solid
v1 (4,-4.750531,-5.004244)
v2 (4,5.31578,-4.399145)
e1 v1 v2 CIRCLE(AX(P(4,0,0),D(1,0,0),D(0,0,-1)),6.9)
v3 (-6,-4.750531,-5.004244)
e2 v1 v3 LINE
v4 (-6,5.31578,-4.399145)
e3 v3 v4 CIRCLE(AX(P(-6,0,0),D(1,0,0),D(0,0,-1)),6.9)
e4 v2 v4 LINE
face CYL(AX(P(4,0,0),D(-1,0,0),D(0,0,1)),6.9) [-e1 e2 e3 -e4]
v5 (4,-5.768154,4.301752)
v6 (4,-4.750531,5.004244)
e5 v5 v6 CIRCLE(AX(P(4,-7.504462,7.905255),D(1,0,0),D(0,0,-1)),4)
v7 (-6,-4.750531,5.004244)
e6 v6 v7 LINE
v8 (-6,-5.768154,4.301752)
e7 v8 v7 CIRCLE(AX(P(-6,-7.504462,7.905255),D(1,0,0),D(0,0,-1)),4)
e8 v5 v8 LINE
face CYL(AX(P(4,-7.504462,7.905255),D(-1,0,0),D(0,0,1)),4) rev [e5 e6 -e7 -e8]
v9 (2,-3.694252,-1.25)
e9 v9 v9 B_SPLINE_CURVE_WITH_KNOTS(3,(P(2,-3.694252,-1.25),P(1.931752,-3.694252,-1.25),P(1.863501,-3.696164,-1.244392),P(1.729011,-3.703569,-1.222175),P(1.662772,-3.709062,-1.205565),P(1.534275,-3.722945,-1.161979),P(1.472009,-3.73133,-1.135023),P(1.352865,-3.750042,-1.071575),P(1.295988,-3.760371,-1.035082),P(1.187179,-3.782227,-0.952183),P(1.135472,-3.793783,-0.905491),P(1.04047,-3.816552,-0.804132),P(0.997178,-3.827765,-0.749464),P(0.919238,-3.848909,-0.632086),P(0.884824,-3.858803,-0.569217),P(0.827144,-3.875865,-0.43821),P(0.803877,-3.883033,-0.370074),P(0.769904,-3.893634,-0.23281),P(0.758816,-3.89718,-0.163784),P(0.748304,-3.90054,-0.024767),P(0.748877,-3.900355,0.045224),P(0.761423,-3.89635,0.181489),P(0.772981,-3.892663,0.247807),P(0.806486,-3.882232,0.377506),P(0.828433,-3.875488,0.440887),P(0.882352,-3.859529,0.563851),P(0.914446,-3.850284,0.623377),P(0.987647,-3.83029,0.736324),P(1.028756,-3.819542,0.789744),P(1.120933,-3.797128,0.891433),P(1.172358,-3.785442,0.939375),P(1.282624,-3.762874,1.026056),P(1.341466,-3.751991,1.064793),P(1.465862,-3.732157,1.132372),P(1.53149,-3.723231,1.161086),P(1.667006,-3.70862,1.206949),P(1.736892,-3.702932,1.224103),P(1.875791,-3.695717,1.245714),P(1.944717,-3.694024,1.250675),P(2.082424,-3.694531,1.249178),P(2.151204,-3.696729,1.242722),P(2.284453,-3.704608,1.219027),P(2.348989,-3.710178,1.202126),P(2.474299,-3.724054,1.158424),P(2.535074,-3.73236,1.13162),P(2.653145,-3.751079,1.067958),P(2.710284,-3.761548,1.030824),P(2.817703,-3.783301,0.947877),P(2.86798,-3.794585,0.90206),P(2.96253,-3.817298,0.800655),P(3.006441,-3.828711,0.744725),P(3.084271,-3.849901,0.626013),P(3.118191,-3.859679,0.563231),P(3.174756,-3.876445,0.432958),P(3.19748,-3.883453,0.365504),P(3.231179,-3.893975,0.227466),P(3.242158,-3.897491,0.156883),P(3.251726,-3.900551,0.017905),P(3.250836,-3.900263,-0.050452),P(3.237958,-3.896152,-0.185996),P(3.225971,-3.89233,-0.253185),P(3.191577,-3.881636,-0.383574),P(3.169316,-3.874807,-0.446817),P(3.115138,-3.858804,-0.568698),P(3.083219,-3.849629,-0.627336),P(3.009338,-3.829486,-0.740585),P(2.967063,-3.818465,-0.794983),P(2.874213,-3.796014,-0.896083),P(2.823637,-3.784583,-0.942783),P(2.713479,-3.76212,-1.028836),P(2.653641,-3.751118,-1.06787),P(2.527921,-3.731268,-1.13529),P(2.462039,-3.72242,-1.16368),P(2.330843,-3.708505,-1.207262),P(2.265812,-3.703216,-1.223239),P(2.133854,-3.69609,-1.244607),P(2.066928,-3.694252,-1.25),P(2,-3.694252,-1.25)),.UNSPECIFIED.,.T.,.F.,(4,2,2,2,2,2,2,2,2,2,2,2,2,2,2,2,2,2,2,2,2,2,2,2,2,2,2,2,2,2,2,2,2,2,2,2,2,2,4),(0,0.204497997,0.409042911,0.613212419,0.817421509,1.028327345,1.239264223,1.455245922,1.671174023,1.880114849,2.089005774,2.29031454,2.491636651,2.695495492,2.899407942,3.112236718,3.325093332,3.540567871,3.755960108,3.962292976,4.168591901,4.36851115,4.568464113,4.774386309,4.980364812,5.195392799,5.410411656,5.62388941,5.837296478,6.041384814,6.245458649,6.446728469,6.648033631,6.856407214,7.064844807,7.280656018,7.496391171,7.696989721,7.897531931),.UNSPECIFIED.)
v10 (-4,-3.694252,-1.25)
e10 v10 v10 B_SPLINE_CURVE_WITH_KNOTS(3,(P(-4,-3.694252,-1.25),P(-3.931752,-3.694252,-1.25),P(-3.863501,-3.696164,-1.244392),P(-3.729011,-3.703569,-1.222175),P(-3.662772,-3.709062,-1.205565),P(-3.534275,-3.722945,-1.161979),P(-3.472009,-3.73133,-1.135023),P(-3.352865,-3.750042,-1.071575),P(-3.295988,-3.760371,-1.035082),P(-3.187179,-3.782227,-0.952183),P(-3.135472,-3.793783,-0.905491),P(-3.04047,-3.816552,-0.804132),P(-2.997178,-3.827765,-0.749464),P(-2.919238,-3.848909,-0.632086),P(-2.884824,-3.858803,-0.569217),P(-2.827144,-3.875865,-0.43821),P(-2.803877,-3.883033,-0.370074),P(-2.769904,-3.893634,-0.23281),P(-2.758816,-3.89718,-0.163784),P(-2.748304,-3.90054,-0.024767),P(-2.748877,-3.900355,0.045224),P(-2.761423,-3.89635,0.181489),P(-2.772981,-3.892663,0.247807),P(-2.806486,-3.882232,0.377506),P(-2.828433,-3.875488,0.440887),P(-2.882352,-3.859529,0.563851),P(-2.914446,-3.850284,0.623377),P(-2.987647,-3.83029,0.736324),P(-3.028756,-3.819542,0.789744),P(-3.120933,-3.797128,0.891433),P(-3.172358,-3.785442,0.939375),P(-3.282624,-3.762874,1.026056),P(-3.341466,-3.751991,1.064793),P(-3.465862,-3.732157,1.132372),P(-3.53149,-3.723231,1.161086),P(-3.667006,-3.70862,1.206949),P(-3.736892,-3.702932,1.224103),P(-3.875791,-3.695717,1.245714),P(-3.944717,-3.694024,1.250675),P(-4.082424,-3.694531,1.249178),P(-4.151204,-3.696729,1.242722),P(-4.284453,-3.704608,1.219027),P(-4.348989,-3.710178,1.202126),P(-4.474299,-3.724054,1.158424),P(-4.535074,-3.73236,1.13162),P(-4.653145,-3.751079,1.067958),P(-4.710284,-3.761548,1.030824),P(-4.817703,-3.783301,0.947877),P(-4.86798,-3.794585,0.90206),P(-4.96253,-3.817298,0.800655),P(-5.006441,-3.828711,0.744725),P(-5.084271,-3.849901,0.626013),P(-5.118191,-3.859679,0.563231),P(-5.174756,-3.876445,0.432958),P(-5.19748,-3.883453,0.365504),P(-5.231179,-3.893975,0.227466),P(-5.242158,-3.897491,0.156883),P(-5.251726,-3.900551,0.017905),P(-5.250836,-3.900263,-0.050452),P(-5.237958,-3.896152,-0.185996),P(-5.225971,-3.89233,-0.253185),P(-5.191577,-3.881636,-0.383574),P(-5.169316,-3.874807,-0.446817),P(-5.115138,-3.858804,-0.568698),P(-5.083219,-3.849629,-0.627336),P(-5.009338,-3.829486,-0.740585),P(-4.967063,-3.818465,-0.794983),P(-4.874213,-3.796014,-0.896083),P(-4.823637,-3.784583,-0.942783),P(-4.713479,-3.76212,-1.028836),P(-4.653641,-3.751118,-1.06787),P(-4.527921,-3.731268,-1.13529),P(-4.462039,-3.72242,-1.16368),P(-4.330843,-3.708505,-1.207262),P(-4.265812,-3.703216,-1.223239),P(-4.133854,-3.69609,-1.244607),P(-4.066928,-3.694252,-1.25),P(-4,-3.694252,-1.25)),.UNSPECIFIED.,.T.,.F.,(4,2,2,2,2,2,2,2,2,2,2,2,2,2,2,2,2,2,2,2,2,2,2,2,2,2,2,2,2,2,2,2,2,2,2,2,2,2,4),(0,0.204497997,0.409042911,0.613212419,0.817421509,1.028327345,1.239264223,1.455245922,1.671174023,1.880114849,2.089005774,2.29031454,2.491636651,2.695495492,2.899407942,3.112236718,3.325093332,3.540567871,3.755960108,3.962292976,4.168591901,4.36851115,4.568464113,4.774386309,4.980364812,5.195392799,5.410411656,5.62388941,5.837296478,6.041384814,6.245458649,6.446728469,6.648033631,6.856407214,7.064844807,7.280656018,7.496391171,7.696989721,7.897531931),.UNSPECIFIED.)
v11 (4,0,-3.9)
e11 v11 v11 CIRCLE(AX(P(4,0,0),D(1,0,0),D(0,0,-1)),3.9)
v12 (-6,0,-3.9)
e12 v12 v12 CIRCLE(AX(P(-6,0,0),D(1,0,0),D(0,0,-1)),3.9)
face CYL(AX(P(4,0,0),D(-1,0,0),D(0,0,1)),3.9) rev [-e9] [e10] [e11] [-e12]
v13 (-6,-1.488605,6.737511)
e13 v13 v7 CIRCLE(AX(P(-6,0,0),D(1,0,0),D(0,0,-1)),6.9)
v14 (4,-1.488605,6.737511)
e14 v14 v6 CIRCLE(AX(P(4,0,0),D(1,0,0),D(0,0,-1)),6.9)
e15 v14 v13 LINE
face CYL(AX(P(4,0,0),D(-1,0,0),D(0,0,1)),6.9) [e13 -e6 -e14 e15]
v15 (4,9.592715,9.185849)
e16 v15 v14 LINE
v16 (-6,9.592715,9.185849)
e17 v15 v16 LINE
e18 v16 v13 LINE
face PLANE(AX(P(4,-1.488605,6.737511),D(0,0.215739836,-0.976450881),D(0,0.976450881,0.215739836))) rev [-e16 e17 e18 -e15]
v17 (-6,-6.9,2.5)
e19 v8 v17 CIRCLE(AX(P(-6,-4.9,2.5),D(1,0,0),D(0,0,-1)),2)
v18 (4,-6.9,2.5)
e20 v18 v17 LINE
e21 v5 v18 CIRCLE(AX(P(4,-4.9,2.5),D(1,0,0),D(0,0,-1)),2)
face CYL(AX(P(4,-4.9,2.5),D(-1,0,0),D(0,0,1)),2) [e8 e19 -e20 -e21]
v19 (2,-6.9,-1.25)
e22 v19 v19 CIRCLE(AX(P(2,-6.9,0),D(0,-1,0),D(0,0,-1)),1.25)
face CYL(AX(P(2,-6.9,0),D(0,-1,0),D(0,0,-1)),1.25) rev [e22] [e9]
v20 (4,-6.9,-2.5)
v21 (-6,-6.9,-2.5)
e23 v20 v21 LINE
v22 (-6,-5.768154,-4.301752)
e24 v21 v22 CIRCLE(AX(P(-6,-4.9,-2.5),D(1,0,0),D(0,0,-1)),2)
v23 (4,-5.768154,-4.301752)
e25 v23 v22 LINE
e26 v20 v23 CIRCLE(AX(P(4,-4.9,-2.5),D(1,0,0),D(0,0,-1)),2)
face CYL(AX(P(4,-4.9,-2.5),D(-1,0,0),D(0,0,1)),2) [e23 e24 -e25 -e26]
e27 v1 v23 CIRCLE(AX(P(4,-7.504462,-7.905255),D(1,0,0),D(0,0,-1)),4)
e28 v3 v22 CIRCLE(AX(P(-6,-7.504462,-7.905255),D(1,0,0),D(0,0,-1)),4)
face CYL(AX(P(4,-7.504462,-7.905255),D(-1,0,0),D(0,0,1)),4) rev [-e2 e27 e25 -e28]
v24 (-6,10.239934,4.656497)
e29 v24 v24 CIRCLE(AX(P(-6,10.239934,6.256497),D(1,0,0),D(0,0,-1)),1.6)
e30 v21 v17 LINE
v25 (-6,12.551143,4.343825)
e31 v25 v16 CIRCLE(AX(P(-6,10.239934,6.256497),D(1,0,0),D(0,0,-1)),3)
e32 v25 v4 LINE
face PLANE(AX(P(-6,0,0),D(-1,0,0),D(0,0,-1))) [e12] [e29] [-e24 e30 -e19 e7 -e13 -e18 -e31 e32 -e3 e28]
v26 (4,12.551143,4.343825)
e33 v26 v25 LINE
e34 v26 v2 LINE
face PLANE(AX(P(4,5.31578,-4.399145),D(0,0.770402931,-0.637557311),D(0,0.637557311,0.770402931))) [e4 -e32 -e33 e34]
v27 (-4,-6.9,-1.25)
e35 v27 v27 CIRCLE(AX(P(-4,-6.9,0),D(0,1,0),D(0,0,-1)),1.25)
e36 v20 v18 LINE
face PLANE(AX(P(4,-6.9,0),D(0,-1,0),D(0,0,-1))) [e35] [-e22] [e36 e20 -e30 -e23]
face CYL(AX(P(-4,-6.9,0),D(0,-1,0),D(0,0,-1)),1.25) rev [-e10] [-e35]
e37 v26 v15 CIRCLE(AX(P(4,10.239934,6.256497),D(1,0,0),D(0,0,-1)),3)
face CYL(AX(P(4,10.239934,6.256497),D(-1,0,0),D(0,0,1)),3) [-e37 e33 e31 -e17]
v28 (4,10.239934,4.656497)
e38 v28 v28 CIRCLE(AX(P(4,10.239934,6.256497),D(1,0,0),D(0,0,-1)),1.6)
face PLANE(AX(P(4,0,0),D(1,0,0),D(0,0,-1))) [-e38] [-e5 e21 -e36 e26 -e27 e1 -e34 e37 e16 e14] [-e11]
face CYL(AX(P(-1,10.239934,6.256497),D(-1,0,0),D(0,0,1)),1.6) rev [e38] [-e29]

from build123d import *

# Parameters (mm, degrees)
BOSS_EXTRUDE1_START    = -1
SKETCH2_R              = 3.9
BOSS_EXTRUDE1_DEPTH    = 5
M3_CLEARANCE_HOLE1_D   = 3.2
M3_TAPPED_HOLE1_REACH  = 24.345
M3_TAPPED_HOLE1_BORE_R = 1.25
MIRROR3_START          = -6
MIRROR3_OUTLINE_R      = 3.9
MIRROR3_OUTLINE_R_2    = 1.6
MIRROR3_DEPTH          = 5
MIRROR3_START_2        = -6.9
MIRROR3_2_OUTLINE_R    = 1.25
MIRROR3_2_DEPTH        = 3.205747808


with BuildPart() as part:
    # Sketch2 → Boss-Extrude1 (new body)
    with BuildSketch(Plane(origin=(0, 0, 0), x_dir=(0, 0, -1), z_dir=(1, 0, 0)).offset(BOSS_EXTRUDE1_START)):
        with BuildLine():
            Line((2.5, -6.9), (-2.5, -6.9))
            ThreePointArc((-2.5, -6.9), (-3.563882529, -6.593562507), (-4.301751563, -5.768153965))
            ThreePointArc((-4.301751563, -5.768153965), (-4.613436828, -5.232032538), (-5.004243793, -4.750530924))
            ThreePointArc((-5.004243793, -4.750530924), (-6.093212803, -3.237708717), (-6.737511079, -1.488604871))
            Line((-6.737511079, -1.488604871), (-9.185849324, 9.592714537))
            ThreePointArc((-9.185849324, 9.592714537), (-7.820620852, 12.799917558), (-4.343824749, 12.551142838))
            Line((-4.343824749, 12.551142838), (4.399145444, 5.315780221))
            ThreePointArc((4.399145444, 5.315780221), (6.88756759, 0.414020163), (5.004243793, -4.750530924))
            ThreePointArc((5.004243793, -4.750530924), (4.613436828, -5.232032538), (4.301751563, -5.768153965))
            ThreePointArc((4.301751563, -5.768153965), (3.563882529, -6.593562507), (2.5, -6.9))
        make_face()
        Circle(SKETCH2_R, mode=Mode.SUBTRACT)
    extrude(amount=BOSS_EXTRUDE1_DEPTH)

    # M3 Clearance Hole1 (through all)
    with Locations(Plane.ZY.offset(1)):
        with Locations((6.256496681, 10.239934047)):
            Hole(M3_CLEARANCE_HOLE1_D / 2)

    # M3 Tapped Hole1 bore → M3 Tapped Hole1 (cut, up to next)
    with BuildSketch(Plane(origin=(0, -6.9, 1.914772396), x_dir=(-1, 0, 0), z_dir=(0, -1, 0)), mode=Mode.PRIVATE) as m3_tapped_hole1_sk1:
        with Locations((-2, 1.914772396)):
            Circle(M3_TAPPED_HOLE1_BORE_R)
    m3_tapped_hole1_tool1 = extrude(m3_tapped_hole1_sk1.sketch, amount=-M3_TAPPED_HOLE1_REACH, mode=Mode.PRIVATE) & part.part
    add(m3_tapped_hole1_tool1.solids().sort_by_distance((2, -6.9, 0))[0], mode=Mode.SUBTRACT)

    # Mirror3: read off the stored shape, not the designer's step
    # Mirror3 outline → Mirror3 (add)
    with BuildSketch(Plane.YZ.offset(MIRROR3_START)):
        with BuildLine():
            ThreePointArc((-4.750530924, -5.004243793), (0.414020162, -6.88756759), (5.315780221, -4.399145444))
            Line((5.315780221, -4.399145444), (12.551142838, 4.343824749))
            ThreePointArc((12.551142838, 4.343824749), (12.799917558, 7.820620852), (9.592714537, 9.185849324))
            Line((9.592714537, 9.185849324), (-1.488604871, 6.737511079))
            ThreePointArc((-1.488604871, 6.737511079), (-3.237708717, 6.093212803), (-4.750530924, 5.004243793))
            ThreePointArc((-4.750530924, 5.004243793), (-5.232032538, 4.613436828), (-5.768153965, 4.301751563))
            ThreePointArc((-5.768153965, 4.301751563), (-6.593562507, 3.563882529), (-6.9, 2.5))
            Line((-6.9, 2.5), (-6.9, -2.5))
            ThreePointArc((-6.9, -2.5), (-6.593562507, -3.563882529), (-5.768153965, -4.301751563))
            ThreePointArc((-5.768153965, -4.301751563), (-5.232032538, -4.613436828), (-4.750530924, -5.004243793))
        make_face()
        Circle(MIRROR3_OUTLINE_R, mode=Mode.SUBTRACT)
        with Locations((10.239934047, 6.256496681)):
            Circle(MIRROR3_OUTLINE_R_2, mode=Mode.SUBTRACT)
    extrude(amount=MIRROR3_DEPTH)

    # Mirror3 2 outline → Mirror3 2 (cut)
    with BuildSketch(Plane(origin=(0, 0, 0), x_dir=(1, 0, 0), z_dir=(0, 1, 0)).offset(MIRROR3_START_2)):
        with Locations((-4, 0)):
            Circle(MIRROR3_2_OUTLINE_R)
    extrude(amount=MIRROR3_2_DEPTH, mode=Mode.SUBTRACT)


solid = part.part
